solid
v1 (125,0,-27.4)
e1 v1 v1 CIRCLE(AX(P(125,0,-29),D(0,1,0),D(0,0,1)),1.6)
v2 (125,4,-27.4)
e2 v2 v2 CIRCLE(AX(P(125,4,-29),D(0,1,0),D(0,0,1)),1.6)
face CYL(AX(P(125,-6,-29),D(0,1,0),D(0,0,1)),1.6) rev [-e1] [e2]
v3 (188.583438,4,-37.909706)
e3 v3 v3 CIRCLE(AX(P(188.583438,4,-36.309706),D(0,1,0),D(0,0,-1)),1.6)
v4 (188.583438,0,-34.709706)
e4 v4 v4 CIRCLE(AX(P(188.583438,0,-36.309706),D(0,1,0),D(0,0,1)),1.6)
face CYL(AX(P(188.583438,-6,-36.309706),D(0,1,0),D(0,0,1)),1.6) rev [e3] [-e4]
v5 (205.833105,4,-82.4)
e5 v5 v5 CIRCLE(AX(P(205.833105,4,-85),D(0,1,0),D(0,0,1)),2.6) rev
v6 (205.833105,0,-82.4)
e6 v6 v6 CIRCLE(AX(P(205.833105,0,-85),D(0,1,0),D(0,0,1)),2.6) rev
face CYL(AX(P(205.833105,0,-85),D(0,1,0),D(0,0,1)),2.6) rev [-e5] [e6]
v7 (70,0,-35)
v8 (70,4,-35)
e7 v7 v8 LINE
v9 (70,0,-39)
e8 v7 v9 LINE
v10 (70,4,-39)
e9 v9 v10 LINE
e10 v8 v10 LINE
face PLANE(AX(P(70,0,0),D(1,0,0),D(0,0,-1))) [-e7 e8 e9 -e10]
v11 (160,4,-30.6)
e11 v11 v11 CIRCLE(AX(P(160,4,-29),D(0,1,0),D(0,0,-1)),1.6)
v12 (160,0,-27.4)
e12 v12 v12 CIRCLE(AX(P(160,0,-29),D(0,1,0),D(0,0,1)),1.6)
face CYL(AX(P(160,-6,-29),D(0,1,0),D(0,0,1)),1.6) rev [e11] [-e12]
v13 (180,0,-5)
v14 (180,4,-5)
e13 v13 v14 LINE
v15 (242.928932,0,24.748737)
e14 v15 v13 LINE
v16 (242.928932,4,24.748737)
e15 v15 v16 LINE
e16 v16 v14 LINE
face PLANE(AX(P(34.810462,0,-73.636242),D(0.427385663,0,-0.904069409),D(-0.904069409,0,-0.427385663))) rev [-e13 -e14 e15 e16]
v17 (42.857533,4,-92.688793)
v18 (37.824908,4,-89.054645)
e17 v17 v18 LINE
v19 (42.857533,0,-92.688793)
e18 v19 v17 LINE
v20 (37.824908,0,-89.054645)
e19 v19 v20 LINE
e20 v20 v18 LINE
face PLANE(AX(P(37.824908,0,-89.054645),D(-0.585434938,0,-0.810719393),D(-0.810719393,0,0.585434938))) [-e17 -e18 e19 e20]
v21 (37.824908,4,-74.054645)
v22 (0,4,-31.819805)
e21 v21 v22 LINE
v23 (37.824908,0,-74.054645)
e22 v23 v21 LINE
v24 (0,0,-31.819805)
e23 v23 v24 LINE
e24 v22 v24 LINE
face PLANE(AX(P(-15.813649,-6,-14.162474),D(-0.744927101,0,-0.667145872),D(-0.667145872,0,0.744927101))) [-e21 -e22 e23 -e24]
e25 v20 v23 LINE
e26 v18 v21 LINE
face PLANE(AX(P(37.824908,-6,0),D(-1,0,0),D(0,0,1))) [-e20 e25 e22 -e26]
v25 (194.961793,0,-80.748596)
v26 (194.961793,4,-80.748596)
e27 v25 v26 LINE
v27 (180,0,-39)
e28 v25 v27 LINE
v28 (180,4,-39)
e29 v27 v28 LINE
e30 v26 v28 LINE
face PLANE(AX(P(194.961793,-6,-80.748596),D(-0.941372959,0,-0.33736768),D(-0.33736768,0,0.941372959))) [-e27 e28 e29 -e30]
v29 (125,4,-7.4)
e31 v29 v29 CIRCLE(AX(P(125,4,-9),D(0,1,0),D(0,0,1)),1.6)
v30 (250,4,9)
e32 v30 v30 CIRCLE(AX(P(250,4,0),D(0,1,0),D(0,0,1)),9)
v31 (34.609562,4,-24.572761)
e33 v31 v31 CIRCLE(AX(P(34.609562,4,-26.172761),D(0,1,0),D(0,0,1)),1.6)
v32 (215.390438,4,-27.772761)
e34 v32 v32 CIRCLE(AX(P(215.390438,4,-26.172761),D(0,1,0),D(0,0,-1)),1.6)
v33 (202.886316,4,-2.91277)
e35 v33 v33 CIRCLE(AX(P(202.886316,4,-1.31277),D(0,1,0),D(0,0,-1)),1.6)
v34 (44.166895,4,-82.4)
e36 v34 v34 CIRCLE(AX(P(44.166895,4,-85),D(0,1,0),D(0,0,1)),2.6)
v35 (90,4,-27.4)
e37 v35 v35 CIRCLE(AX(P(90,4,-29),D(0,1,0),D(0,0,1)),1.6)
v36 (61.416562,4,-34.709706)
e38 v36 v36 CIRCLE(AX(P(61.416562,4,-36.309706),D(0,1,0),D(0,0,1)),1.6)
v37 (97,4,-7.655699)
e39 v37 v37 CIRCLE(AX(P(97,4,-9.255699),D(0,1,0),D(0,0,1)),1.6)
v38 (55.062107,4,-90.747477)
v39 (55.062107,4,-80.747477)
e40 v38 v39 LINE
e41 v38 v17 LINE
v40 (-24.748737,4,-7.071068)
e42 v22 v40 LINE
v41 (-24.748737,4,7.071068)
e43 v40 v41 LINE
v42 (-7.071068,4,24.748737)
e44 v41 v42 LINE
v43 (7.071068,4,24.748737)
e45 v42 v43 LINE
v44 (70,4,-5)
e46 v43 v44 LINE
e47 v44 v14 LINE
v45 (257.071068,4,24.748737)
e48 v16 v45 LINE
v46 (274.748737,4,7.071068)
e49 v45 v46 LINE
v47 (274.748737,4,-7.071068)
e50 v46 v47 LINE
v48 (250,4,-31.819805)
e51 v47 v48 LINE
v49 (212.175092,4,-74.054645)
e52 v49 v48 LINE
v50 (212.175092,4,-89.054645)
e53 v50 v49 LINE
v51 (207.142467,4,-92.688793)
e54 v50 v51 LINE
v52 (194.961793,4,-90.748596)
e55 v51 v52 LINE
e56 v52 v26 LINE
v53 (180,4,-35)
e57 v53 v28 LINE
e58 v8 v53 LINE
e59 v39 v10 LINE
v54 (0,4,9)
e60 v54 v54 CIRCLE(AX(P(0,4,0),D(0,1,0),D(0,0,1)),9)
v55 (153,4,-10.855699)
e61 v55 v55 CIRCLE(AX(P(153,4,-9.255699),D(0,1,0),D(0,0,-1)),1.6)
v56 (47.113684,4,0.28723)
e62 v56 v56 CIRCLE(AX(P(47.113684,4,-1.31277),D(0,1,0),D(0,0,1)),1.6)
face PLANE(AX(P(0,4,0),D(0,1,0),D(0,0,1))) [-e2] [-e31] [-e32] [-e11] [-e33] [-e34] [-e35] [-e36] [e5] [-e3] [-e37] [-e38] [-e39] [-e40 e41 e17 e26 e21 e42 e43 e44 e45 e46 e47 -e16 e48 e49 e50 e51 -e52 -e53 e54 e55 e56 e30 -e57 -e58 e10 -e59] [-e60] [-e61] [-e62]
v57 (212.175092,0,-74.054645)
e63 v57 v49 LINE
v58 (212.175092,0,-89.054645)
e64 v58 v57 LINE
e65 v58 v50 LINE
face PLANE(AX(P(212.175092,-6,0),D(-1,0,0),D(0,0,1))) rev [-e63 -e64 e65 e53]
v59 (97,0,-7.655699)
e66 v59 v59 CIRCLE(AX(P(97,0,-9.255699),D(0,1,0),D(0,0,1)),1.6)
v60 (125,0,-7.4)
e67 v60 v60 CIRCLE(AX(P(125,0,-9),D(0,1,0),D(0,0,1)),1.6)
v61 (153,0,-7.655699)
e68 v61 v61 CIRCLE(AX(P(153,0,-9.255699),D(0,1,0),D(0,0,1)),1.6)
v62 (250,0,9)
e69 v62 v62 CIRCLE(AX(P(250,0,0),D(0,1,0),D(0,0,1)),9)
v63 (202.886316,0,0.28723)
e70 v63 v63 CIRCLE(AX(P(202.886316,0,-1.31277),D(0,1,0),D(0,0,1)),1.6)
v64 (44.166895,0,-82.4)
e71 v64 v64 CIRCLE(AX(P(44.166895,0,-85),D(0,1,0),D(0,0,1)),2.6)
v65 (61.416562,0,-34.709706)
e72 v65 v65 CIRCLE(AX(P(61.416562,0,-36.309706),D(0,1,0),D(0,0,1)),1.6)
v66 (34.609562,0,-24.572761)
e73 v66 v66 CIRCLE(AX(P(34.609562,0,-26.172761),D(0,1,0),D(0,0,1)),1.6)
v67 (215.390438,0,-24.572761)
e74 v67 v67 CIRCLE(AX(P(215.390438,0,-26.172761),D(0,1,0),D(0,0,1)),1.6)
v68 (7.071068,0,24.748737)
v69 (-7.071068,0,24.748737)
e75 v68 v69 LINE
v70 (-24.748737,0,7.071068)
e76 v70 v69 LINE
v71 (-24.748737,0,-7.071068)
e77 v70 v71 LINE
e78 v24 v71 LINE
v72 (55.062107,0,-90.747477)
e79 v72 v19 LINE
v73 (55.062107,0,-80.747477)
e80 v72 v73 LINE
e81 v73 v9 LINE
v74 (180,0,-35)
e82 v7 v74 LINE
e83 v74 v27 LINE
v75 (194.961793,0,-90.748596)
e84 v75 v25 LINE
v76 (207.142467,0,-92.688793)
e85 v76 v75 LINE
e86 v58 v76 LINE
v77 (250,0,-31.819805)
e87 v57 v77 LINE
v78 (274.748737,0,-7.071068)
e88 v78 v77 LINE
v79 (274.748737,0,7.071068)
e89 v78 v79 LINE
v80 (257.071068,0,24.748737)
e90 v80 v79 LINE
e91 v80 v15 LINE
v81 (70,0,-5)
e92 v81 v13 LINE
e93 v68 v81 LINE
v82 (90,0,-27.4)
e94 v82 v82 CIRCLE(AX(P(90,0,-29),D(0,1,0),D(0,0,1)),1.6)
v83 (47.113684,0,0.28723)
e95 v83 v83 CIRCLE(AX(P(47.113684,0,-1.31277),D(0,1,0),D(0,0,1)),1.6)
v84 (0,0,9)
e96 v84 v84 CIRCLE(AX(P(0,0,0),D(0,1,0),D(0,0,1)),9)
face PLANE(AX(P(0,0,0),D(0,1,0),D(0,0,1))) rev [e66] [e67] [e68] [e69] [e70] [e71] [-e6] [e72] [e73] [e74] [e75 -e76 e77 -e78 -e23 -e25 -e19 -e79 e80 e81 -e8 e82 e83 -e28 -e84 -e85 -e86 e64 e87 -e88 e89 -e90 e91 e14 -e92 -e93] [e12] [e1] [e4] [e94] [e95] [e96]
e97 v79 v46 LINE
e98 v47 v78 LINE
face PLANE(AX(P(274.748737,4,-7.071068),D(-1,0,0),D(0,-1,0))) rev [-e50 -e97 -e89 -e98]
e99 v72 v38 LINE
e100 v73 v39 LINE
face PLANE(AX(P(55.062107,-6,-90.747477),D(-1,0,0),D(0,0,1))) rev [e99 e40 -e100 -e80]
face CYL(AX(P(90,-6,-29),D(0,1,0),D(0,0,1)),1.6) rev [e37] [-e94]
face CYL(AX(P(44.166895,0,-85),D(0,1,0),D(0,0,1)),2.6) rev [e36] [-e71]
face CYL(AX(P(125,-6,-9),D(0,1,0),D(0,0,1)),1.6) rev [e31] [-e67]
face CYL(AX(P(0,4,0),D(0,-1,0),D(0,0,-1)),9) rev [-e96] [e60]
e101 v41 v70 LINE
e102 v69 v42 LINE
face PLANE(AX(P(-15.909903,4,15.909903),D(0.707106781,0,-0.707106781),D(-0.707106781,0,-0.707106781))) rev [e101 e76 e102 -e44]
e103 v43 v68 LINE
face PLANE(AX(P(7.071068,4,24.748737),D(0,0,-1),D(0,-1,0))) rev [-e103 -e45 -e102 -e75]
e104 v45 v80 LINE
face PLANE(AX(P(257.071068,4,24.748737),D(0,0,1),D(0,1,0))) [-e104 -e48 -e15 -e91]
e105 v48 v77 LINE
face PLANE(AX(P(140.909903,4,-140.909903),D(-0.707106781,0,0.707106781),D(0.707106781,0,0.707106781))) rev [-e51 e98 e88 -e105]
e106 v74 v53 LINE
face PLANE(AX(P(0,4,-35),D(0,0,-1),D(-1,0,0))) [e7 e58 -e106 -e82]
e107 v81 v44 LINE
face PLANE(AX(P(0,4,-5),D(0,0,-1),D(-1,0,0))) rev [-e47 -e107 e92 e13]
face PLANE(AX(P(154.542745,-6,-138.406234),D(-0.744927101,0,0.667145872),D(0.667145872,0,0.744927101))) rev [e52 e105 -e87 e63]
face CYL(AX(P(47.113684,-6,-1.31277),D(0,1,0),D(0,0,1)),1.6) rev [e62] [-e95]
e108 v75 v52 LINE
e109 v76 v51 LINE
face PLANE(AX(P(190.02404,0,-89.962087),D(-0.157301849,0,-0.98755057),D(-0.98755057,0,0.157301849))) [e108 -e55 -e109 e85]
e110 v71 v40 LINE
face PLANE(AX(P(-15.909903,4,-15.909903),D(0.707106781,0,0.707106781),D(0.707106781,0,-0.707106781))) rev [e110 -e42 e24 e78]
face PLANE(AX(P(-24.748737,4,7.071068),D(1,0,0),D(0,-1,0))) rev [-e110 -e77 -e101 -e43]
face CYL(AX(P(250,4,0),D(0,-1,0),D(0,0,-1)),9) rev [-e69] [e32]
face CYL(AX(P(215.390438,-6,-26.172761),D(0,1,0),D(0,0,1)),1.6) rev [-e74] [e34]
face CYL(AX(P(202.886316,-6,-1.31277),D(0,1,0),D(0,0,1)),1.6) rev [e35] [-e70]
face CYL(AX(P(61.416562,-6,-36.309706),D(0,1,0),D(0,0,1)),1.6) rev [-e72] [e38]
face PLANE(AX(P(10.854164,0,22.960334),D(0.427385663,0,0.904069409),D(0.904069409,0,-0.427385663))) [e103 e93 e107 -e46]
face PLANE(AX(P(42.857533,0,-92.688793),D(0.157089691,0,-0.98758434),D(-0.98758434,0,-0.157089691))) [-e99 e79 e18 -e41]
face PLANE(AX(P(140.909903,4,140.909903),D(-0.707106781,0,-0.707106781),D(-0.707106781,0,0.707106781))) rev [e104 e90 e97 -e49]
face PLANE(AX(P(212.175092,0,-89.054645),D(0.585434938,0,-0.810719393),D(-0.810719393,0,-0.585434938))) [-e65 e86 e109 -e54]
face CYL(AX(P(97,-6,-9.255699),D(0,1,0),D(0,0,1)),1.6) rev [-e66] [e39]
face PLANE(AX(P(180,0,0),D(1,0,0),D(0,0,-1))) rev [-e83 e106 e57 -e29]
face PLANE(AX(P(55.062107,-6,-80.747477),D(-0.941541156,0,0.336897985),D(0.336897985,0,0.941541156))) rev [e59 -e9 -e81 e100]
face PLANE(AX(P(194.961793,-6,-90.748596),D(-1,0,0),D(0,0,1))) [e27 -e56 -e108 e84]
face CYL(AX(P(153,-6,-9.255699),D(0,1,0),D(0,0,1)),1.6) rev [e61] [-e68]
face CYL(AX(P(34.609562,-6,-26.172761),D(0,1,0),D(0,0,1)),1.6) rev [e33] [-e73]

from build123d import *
from OCP.BRepFilletAPI import BRepFilletAPI_MakeChamfer

# Parameters (mm, degrees)
SKETCH_1_R          = 9
EXTRUDE_1_DEPTH     = 4
FILLET_3_R          = 50
CHAMFER_1_SIZE      = 10
FILLET_4_R          = 170
EXTRUDE_START       = -4
SKETCH_2_R          = 2.6
EXTRUDE_2_DEPTH     = 4
CHAMFER_2_SIZE      = 10
CHAMFER_2_SIZE2     = 10.024068518
FILLET_6_R          = 5
EXTRUDE_4_DEPTH     = 4
SKETCH_7_R          = 1.6
CUT_EXTRUDE_3_DEPTH = 10
CUT_EXTRUDE_4_DEPTH = 10
CUT_EXTRUDE_5_DEPTH = 10
EXTRUDE_6_DEPTH     = 4
EXTRUDE_7_DEPTH     = 4
CUT_EXTRUDE_START   = -4
CUT_EXTRUDE_6_DEPTH = 4
CUT_EXTRUDE_7_DEPTH = 10


with BuildPart() as part:
    # 草图1 → 凸台-拉伸1 (new body)
    with BuildSketch(Plane(origin=(0, 0, 0), x_dir=(1, 0, 0), z_dir=(0, 1, 0))):
        Polygon((5.303300859, 26.516504294), (0, 31.819805153), (-31.819805153, 0), (0, -31.819805153), (31.819805153, 0), (36.819805153, 5), (213.180194847, 5), (218.180194847, 0), (250, -31.819805153), (281.819805153, 0), (250, 31.819805153), (244.696699141, 26.516504294), (236.213203436, 35), (230, 35), (13.786796564, 35), align=None)
        with Locations(Location((0, 0, 0), (0, 0, 270))):
            Circle(SKETCH_1_R, mode=Mode.SUBTRACT)
        with Locations(Location((250, 0, 0), (0, 0, 270))):
            Circle(SKETCH_1_R, mode=Mode.SUBTRACT)
    extrude(amount=EXTRUDE_1_DEPTH)

    # 圆角3
    # the kernel refuses this fillet: 50 mm, written as the material it takes off along each edge
    with BuildSketch(Plane(origin=(236.213203436, -48.450245762, -35), x_dir=(-1, 0, 0), z_dir=(0, 1, 0))) as fillet_3_piece_1:
        with BuildLine():
            CenterArc((19.380098305, 50), FILLET_3_R, 236.132660747, 33.867339253)
            Line((-8.483495706, 8.483495706), (-9.040767586, 7.65316562))
            ThreePointArc((-9.040767586, 7.65316562), (-4.948854634, 3.534641072), (-0.707106781, -0.707106781))
            Line((-0.707106781, -0.707106781), (0, -1))
            Line((0, -1), (19.380098305, -1))
            Line((19.380098305, -1), (19.380098305, 0))
        make_face()
    extrude(amount=100.900491523, mode=Mode.SUBTRACT)
    with BuildSketch(Plane(origin=(13.786796564, -48.450245762, -35), x_dir=(1, 0, 0), z_dir=(0, 1, 0))) as fillet_3_piece_2:
        with BuildLine():
            CenterArc((19.380098305, -50), FILLET_3_R, 90, 33.867339253)
            Line((-8.483495706, -8.483495706), (-9.040767586, -7.65316562))
            ThreePointArc((-9.040767586, -7.65316562), (-4.948854634, -3.534641072), (-0.707106781, 0.707106781))
            Line((-0.707106781, 0.707106781), (0, 1))
            Line((0, 1), (19.380098305, 1))
            Line((19.380098305, 1), (19.380098305, 0))
        make_face()
    extrude(amount=100.900491523, mode=Mode.SUBTRACT)

    # 倒角1
    chamfer_1_edges = [part.edges().sort_by_distance(p)[0] for p in [
        (281.819805153, 2, 0),
        (250, 2, 31.819805153),
        (0, 2, 31.819805153),
        (-31.819805153, 2, 0),
    ]]
    chamfer(chamfer_1_edges, length=CHAMFER_1_SIZE)

    # 圆角4
    # the kernel refuses this fillet: 170 mm, written as the material it adds along each edge
    with BuildSketch(Plane(origin=(244.696699141, 0, -26.516504294), x_dir=(0.7071067811865487, 0, -0.7071067811865464), z_dir=(0, 1, 0))) as fillet_4_piece_1:
        with BuildLine():
            CenterArc((130.807104298, 117.027167913), FILLET_4_R, 215.157343004, 8.345858433)
            Line((-8.180446561, 19.137123955), (-10.960197579, 17.179323075))
            ThreePointArc((-10.960197579, 17.179323075), (-6.209829397, 8.662505006), (-3.336021383, -0.65647645))
            Line((-3.336021383, -0.65647645), (0, -3.4))
            ThreePointArc((0, -3.4), (3.75, -3.4), (5.033857914, -2.340543358))
            Line((5.033857914, -2.340543358), (7.5, 0))
        make_face()
    extrude(amount=4)
    with BuildSketch(Plane(origin=(5.303300859, 0, -26.516504294), x_dir=(-0.7071067811865499, 0, -0.707106781186545), z_dir=(0, 1, 0))) as fillet_4_piece_2:
        with BuildLine():
            CenterArc((130.807104298, -117.027167913), FILLET_4_R, 136.496798562, 8.345858433)
            Line((-8.180446561, -19.137123955), (-10.960197579, -17.179323075))
            ThreePointArc((-10.960197579, -17.179323075), (-6.209829397, -8.662505006), (-3.336021383, 0.65647645))
            Line((-3.336021383, 0.65647645), (0, 3.4))
            ThreePointArc((0, 3.4), (3.75, 3.4), (5.033857914, 2.340543358))
            Line((5.033857914, 2.340543358), (7.5, 0))
        make_face()
    extrude(amount=4)
    with BuildSketch(Plane(origin=(213.180194847, 0, -5), x_dir=(0.7071067811865461, 0, 0.707106781186549), z_dir=(0, 1, 0))) as fillet_4_piece_3:
        with BuildLine():
            CenterArc((73.311428823, -167.104876781), FILLET_4_R, 100.589244362, 34.410755638)
            Line((-46.896723979, -46.896723979), (-49.300887035, -44.492560923))
            Line((-49.300887035, -44.492560923), (-2.404163056, 2.404163056))
            Line((-2.404163056, 2.404163056), (0, 3.4))
            ThreePointArc((0, 3.4), (21.035533906, 3.4), (41.446260592, 3.342097536))
            Line((41.446260592, 3.342097536), (42.071067812, 0))
        make_face()
    extrude(amount=4)
    with BuildSketch(Plane(origin=(36.819805153, 0, -5), x_dir=(1, 0, 0), z_dir=(0, 1, 0))) as fillet_4_piece_4:
        with BuildLine():
            CenterArc((66.321983082, -170), FILLET_4_R, 90, 34.410755638)
            Line((-29.748737342, -29.748737342), (-31.67015175, -26.943712088))
            ThreePointArc((-31.67015175, -26.943712088), (-17.278531727, -12.470205615), (-2.404163056, 2.404163056))
            Line((-2.404163056, 2.404163056), (0, 3.4))
            Line((0, 3.4), (66.321983082, 3.4))
            Line((66.321983082, 3.4), (66.321983082, 0))
        make_face()
    extrude(amount=4)

    # 草图2 → 凸台-拉伸2 (add)
    # profile 1 of 2: a face of its own
    with BuildSketch(Plane(origin=(0, 4, 0), x_dir=(1, 0, 0), z_dir=(0, 1, 0)).offset(EXTRUDE_START)):
        with BuildLine():
            Line((33.166894869, 35), (70, 35))
            Line((70, 35), (70, 89.938046945))
            Line((70, 89.938046945), (52.173767708, 89.980797886))
            Line((52.173767708, 89.980797886), (45.293317142, 91.980771652))
            Line((45.293317142, 91.980771652), (41.239720179, 89.053596963))
            Line((41.239720179, 89.053596963), (37.186123217, 86.126422273))
            Line((37.186123217, 86.126422273), (34.934162449, 75.803316969))
            Line((34.934162449, 75.803316969), (0, 31.819805153))
            ThreePointArc((0, 31.819805153), (12.354394119, 32.593454654), (24.619740216, 34.264045178))
            ThreePointArc((24.619740216, 34.264045178), (28.877504407, 34.815671525), (33.166894869, 35))
        make_face()
        with Locations(Location((44.166894869, 85, 0), (0, 0, 270))):
            Circle(SKETCH_2_R, mode=Mode.SUBTRACT)
    # profile 2 of 2: a face of its own
    with BuildSketch(Plane(origin=(0, 4, 0), x_dir=(1, 0, 0), z_dir=(0, 1, 0)).offset(EXTRUDE_START)):
        with BuildLine():
            Line((180, 89.938046945), (197.826232292, 89.980797886))
            Line((197.826232292, 89.980797886), (204.706682858, 91.980771652))
            Line((204.706682858, 91.980771652), (208.760279821, 89.053596963))
            Line((208.760279821, 89.053596963), (212.813876783, 86.126422273))
            Line((212.813876783, 86.126422273), (215.065837551, 75.803316969))
            Line((215.065837551, 75.803316969), (250, 31.819805153))
            ThreePointArc((250, 31.819805153), (237.645605881, 32.593454654), (225.380259784, 34.264045178))
            ThreePointArc((225.380259784, 34.264045178), (221.122495593, 34.815671525), (216.833105131, 35))
            Line((216.833105131, 35), (180, 35))
            Line((180, 35), (180, 89.938046945))
        make_face()
        with Locations(Location((205.833105131, 85, 0), (0, 0, 270))):
            Circle(SKETCH_2_R, mode=Mode.SUBTRACT)
    extrude(amount=EXTRUDE_2_DEPTH)

    # 倒角2: one chamfer whose edges measure the first distance from different faces: ONE call of the kernel's chamfer builder (chamfer() names one face for all edges)
    chamfer_2_edges_1 = [part.edges().sort_by_distance(p)[0] for p in [
        (70, 2, -89.938046945),
    ]]
    chamfer_2_side_1 = [part.faces().sort_by_distance(p)[0] for p in [
        (61.086883854, 2, -89.959422415),
    ]]
    chamfer_2_edges_2 = [part.edges().sort_by_distance(p)[0] for p in [
        (180, 2, -89.938046945),
    ]]
    chamfer_2_side_2 = [part.faces().sort_by_distance(p)[0] for p in [
        (180, 2, -62.469023472),
    ]]
    chamfer_2 = BRepFilletAPI_MakeChamfer(part.part.solid().wrapped)
    for e in chamfer_2_edges_1:
        chamfer_2.Add(CHAMFER_2_SIZE, CHAMFER_2_SIZE2, e.wrapped, chamfer_2_side_1[0].wrapped)  # the first distance lies on this face
    for e in chamfer_2_edges_2:
        chamfer_2.Add(CHAMFER_2_SIZE, CHAMFER_2_SIZE2, e.wrapped, chamfer_2_side_2[0].wrapped)  # the first distance lies on this face
    add(Compound.cast(chamfer_2.Shape()), mode=Mode.REPLACE)

    # 圆角6
    fillet_6_edges = [part.edges().sort_by_distance(p)[0] for p in [
        (34.934162449, 2, -75.803316969),
        (52.173767708, 2, -89.980797886),
        (197.826232292, 2, -89.980797886),
    ]]
    fillet(fillet_6_edges, radius=FILLET_6_R)

    # 草图6 → 凸台-拉伸4 (add)
    with BuildSketch(Plane(origin=(0, 4, 0), x_dir=(1, 0, 0), z_dir=(0, 1, 0))):
        Polygon((37.186123217, 86.126422273), (37.824908007, 89.054644979), (42.857532511, 92.688792925), (45.293317142, 91.980771652), align=None)
        Polygon((212.175091993, 89.054644979), (207.142467489, 92.688792925), (204.706682858, 91.980771652), (212.813876783, 86.126422273), align=None)
    extrude(amount=-EXTRUDE_4_DEPTH)

    # 草图7 → 切除-拉伸3 (cut)
    with BuildSketch(Plane(origin=(0, 4, 0), x_dir=(1, 0, 0), z_dir=(0, 1, 0))):
        with Locations(Location((34.609562391, 26.172761135, 0), (0, 0, 270))):
            Circle(SKETCH_7_R)
        with Locations(Location((47.113684451, 1.312769582, 0), (0, 0, 270))):
            Circle(SKETCH_7_R)
        with Locations(Location((97, 9.255699158, 0), (0, 0, 270))):
            Circle(SKETCH_7_R)
        with Locations(Location((125, 29, 0), (0, 0, 270))):
            Circle(SKETCH_7_R)
        with Locations(Location((125, 9, 0), (0, 0, 270))):
            Circle(SKETCH_7_R)
        with Locations(Location((61.416561737, 36.309705645, 0), (0, 0, 270))):
            Circle(SKETCH_7_R)
        with Locations(Location((188.583438263, 36.309705645, 0), (0, 0, 270))):
            Circle(SKETCH_7_R)
        with Locations(Location((153, 9.255699158, 0), (0, 0, 270))):
            Circle(SKETCH_7_R)
        with Locations(Location((202.886315549, 1.312769582, 0), (0, 0, 270))):
            Circle(SKETCH_7_R)
        with Locations(Location((215.390437609, 26.172761135, 0), (0, 0, 270))):
            Circle(SKETCH_7_R)
        with Locations(Location((90, 29, 0), (0, 0, 270))):
            Circle(SKETCH_7_R)
        with Locations(Location((160, 29, 0), (0, 0, 270))):
            Circle(SKETCH_7_R)
    extrude(amount=-CUT_EXTRUDE_3_DEPTH, mode=Mode.SUBTRACT)

    # 草图8 → 切除-拉伸4 (cut)
    with BuildSketch(Plane(origin=(0, 4, 0), x_dir=(1, 0, 0), z_dir=(0, 1, 0))):
        with BuildLine():
            Line((37.824908007, 89.054644979), (0, 89.054644979))
            Line((0, 89.054644979), (0, 31.819805153))
            Line((0, 31.819805153), (34.211863658, 74.893913817))
            ThreePointArc((34.211863658, 74.893913817), (34.813909711, 75.860371791), (35.181686599, 76.937980545))
            Line((35.181686599, 76.937980545), (37.824908007, 89.054644979))
        make_face()
        with BuildLine():
            Line((37.824908007, 74.054644979), (0, 31.819805153))
            Line((0, 31.819805153), (34.211863658, 74.893913817))
            ThreePointArc((34.211863658, 74.893913817), (34.813909711, 75.860371791), (35.181686599, 76.937980545))
            Line((35.181686599, 76.937980545), (37.824908007, 89.054644979))
            Line((37.824908007, 89.054644979), (37.824908007, 74.054644979))
        make_face()
        Polygon((212.175091993, 89.054644979), (212.175091993, 74.054644979), (250, 31.819805153), (215.065837551, 75.803316969), align=None)
        Polygon((250, 89.054644979), (250, 31.819805153), (215.065837551, 75.803316969), (212.175091993, 89.054644979), align=None)
    extrude(amount=-CUT_EXTRUDE_4_DEPTH, mode=Mode.SUBTRACT)

    # 草图10 → 切除-拉伸5 (cut)
    with BuildSketch(Plane(origin=(0, 4, 0), x_dir=(1, 0, 0), z_dir=(0, 1, 0))):
        Polygon((60.000028757, 89.962028915), (70, 39), (70, 79.913978427), align=None)
        Polygon((190.024039692, 89.962086636), (180, 39), (180, 79.938046945), align=None)
    extrude(amount=-CUT_EXTRUDE_5_DEPTH, mode=Mode.SUBTRACT)

    # 草图11 → 凸台-拉伸6 (add)
    with BuildSketch(Plane(origin=(0, 4, 0), x_dir=(1, 0, 0), z_dir=(0, 1, 0))):
        Polygon((42.857532511, 92.688792925), (60.000028757, 89.962028915), (60.948179485, 85.13004654), align=None)
        Polygon((190.024039692, 89.962086636), (207.142467489, 92.688792925), (188.87547831, 84.122815598), align=None)
    extrude(amount=-EXTRUDE_6_DEPTH)

    # 草图12 → 凸台-拉伸7 (add)
    with BuildSketch(Plane(origin=(0, 4, 0), x_dir=(1, 0, 0), z_dir=(0, 1, 0)).offset(EXTRUDE_START)):
        with BuildLine():
            Line((7.071067812, -24.748737342), (55.733906645, -1.744088122))
            ThreePointArc((55.733906645, -1.744088122), (30.48622561, -11.308200545), (7.071067812, -24.748737342))
        make_face()
        with BuildLine():
            ThreePointArc((242.928932188, -24.748737342), (219.51377439, -11.308200545), (194.266093355, -1.744088122))
            Line((194.266093355, -1.744088122), (242.928932188, -24.748737342))
        make_face()
        with BuildLine():
            Line((188.394190901, 5), (180, 5))
            Line((180, 5), (194.266093355, -1.744088122))
            ThreePointArc((194.266093355, -1.744088122), (219.51377439, -11.308200545), (242.928932188, -24.748737342))
            Line((242.928932188, -24.748737342), (242.928932188, -20.020632947))
            Line((242.928932188, -20.020632947), (188.394190901, 5))
        make_face()
        with BuildLine():
            Line((55.733906645, -1.744088122), (70, 5))
            Line((70, 5), (63.353452333, 5))
            Line((63.353452333, 5), (4.835925233, -20.020632947))
            Line((4.835925233, -20.020632947), (7.071067812, -24.748737342))
            ThreePointArc((7.071067812, -24.748737342), (30.48622561, -11.308200545), (55.733906645, -1.744088122))
        make_face()
    extrude(amount=EXTRUDE_7_DEPTH)

    # 草图13 → 切除-拉伸6 (cut)
    with BuildSketch(Plane(origin=(0, 4, 0), x_dir=(1, 0, 0), z_dir=(0, 1, 0)).offset(CUT_EXTRUDE_START)):
        with BuildLine():
            ThreePointArc((55.733906645, -1.744088122), (79.199200857, 3.305533212), (103.141788235, 5))
            Line((103.141788235, 5), (70, 5))
            Line((70, 5), (55.733906645, -1.744088122))
        make_face()
        with BuildLine():
            Line((55.733906645, -1.744088122), (194.266093355, -1.744088122))
            ThreePointArc((194.266093355, -1.744088122), (170.800799143, 3.305533212), (146.858211765, 5))
            Line((146.858211765, 5), (103.141788235, 5))
            ThreePointArc((103.141788235, 5), (79.199200857, 3.305533212), (55.733906645, -1.744088122))
        make_face()
        with BuildLine():
            Line((180, 5), (146.858211765, 5))
            ThreePointArc((146.858211765, 5), (170.800799143, 3.305533212), (194.266093355, -1.744088122))
            Line((194.266093355, -1.744088122), (180, 5))
        make_face()
    extrude(amount=CUT_EXTRUDE_6_DEPTH, mode=Mode.SUBTRACT)

    # 草图14 → 切除-拉伸7 (cut)
    with BuildSketch(Plane(origin=(0, 4, 0), x_dir=(1, 0, 0), z_dir=(0, 1, 0))):
        Polygon((55.062107056, 90.747477369), (55.062107056, 80.747477369), (70, 39), (60.000028757, 89.962028915), align=None)
        Polygon((194.961792542, 90.748595883), (194.961792542, 80.748595883), (180, 39), (190.024039692, 89.962086636), align=None)
    extrude(amount=-CUT_EXTRUDE_7_DEPTH, mode=Mode.SUBTRACT)


solid = part.part
